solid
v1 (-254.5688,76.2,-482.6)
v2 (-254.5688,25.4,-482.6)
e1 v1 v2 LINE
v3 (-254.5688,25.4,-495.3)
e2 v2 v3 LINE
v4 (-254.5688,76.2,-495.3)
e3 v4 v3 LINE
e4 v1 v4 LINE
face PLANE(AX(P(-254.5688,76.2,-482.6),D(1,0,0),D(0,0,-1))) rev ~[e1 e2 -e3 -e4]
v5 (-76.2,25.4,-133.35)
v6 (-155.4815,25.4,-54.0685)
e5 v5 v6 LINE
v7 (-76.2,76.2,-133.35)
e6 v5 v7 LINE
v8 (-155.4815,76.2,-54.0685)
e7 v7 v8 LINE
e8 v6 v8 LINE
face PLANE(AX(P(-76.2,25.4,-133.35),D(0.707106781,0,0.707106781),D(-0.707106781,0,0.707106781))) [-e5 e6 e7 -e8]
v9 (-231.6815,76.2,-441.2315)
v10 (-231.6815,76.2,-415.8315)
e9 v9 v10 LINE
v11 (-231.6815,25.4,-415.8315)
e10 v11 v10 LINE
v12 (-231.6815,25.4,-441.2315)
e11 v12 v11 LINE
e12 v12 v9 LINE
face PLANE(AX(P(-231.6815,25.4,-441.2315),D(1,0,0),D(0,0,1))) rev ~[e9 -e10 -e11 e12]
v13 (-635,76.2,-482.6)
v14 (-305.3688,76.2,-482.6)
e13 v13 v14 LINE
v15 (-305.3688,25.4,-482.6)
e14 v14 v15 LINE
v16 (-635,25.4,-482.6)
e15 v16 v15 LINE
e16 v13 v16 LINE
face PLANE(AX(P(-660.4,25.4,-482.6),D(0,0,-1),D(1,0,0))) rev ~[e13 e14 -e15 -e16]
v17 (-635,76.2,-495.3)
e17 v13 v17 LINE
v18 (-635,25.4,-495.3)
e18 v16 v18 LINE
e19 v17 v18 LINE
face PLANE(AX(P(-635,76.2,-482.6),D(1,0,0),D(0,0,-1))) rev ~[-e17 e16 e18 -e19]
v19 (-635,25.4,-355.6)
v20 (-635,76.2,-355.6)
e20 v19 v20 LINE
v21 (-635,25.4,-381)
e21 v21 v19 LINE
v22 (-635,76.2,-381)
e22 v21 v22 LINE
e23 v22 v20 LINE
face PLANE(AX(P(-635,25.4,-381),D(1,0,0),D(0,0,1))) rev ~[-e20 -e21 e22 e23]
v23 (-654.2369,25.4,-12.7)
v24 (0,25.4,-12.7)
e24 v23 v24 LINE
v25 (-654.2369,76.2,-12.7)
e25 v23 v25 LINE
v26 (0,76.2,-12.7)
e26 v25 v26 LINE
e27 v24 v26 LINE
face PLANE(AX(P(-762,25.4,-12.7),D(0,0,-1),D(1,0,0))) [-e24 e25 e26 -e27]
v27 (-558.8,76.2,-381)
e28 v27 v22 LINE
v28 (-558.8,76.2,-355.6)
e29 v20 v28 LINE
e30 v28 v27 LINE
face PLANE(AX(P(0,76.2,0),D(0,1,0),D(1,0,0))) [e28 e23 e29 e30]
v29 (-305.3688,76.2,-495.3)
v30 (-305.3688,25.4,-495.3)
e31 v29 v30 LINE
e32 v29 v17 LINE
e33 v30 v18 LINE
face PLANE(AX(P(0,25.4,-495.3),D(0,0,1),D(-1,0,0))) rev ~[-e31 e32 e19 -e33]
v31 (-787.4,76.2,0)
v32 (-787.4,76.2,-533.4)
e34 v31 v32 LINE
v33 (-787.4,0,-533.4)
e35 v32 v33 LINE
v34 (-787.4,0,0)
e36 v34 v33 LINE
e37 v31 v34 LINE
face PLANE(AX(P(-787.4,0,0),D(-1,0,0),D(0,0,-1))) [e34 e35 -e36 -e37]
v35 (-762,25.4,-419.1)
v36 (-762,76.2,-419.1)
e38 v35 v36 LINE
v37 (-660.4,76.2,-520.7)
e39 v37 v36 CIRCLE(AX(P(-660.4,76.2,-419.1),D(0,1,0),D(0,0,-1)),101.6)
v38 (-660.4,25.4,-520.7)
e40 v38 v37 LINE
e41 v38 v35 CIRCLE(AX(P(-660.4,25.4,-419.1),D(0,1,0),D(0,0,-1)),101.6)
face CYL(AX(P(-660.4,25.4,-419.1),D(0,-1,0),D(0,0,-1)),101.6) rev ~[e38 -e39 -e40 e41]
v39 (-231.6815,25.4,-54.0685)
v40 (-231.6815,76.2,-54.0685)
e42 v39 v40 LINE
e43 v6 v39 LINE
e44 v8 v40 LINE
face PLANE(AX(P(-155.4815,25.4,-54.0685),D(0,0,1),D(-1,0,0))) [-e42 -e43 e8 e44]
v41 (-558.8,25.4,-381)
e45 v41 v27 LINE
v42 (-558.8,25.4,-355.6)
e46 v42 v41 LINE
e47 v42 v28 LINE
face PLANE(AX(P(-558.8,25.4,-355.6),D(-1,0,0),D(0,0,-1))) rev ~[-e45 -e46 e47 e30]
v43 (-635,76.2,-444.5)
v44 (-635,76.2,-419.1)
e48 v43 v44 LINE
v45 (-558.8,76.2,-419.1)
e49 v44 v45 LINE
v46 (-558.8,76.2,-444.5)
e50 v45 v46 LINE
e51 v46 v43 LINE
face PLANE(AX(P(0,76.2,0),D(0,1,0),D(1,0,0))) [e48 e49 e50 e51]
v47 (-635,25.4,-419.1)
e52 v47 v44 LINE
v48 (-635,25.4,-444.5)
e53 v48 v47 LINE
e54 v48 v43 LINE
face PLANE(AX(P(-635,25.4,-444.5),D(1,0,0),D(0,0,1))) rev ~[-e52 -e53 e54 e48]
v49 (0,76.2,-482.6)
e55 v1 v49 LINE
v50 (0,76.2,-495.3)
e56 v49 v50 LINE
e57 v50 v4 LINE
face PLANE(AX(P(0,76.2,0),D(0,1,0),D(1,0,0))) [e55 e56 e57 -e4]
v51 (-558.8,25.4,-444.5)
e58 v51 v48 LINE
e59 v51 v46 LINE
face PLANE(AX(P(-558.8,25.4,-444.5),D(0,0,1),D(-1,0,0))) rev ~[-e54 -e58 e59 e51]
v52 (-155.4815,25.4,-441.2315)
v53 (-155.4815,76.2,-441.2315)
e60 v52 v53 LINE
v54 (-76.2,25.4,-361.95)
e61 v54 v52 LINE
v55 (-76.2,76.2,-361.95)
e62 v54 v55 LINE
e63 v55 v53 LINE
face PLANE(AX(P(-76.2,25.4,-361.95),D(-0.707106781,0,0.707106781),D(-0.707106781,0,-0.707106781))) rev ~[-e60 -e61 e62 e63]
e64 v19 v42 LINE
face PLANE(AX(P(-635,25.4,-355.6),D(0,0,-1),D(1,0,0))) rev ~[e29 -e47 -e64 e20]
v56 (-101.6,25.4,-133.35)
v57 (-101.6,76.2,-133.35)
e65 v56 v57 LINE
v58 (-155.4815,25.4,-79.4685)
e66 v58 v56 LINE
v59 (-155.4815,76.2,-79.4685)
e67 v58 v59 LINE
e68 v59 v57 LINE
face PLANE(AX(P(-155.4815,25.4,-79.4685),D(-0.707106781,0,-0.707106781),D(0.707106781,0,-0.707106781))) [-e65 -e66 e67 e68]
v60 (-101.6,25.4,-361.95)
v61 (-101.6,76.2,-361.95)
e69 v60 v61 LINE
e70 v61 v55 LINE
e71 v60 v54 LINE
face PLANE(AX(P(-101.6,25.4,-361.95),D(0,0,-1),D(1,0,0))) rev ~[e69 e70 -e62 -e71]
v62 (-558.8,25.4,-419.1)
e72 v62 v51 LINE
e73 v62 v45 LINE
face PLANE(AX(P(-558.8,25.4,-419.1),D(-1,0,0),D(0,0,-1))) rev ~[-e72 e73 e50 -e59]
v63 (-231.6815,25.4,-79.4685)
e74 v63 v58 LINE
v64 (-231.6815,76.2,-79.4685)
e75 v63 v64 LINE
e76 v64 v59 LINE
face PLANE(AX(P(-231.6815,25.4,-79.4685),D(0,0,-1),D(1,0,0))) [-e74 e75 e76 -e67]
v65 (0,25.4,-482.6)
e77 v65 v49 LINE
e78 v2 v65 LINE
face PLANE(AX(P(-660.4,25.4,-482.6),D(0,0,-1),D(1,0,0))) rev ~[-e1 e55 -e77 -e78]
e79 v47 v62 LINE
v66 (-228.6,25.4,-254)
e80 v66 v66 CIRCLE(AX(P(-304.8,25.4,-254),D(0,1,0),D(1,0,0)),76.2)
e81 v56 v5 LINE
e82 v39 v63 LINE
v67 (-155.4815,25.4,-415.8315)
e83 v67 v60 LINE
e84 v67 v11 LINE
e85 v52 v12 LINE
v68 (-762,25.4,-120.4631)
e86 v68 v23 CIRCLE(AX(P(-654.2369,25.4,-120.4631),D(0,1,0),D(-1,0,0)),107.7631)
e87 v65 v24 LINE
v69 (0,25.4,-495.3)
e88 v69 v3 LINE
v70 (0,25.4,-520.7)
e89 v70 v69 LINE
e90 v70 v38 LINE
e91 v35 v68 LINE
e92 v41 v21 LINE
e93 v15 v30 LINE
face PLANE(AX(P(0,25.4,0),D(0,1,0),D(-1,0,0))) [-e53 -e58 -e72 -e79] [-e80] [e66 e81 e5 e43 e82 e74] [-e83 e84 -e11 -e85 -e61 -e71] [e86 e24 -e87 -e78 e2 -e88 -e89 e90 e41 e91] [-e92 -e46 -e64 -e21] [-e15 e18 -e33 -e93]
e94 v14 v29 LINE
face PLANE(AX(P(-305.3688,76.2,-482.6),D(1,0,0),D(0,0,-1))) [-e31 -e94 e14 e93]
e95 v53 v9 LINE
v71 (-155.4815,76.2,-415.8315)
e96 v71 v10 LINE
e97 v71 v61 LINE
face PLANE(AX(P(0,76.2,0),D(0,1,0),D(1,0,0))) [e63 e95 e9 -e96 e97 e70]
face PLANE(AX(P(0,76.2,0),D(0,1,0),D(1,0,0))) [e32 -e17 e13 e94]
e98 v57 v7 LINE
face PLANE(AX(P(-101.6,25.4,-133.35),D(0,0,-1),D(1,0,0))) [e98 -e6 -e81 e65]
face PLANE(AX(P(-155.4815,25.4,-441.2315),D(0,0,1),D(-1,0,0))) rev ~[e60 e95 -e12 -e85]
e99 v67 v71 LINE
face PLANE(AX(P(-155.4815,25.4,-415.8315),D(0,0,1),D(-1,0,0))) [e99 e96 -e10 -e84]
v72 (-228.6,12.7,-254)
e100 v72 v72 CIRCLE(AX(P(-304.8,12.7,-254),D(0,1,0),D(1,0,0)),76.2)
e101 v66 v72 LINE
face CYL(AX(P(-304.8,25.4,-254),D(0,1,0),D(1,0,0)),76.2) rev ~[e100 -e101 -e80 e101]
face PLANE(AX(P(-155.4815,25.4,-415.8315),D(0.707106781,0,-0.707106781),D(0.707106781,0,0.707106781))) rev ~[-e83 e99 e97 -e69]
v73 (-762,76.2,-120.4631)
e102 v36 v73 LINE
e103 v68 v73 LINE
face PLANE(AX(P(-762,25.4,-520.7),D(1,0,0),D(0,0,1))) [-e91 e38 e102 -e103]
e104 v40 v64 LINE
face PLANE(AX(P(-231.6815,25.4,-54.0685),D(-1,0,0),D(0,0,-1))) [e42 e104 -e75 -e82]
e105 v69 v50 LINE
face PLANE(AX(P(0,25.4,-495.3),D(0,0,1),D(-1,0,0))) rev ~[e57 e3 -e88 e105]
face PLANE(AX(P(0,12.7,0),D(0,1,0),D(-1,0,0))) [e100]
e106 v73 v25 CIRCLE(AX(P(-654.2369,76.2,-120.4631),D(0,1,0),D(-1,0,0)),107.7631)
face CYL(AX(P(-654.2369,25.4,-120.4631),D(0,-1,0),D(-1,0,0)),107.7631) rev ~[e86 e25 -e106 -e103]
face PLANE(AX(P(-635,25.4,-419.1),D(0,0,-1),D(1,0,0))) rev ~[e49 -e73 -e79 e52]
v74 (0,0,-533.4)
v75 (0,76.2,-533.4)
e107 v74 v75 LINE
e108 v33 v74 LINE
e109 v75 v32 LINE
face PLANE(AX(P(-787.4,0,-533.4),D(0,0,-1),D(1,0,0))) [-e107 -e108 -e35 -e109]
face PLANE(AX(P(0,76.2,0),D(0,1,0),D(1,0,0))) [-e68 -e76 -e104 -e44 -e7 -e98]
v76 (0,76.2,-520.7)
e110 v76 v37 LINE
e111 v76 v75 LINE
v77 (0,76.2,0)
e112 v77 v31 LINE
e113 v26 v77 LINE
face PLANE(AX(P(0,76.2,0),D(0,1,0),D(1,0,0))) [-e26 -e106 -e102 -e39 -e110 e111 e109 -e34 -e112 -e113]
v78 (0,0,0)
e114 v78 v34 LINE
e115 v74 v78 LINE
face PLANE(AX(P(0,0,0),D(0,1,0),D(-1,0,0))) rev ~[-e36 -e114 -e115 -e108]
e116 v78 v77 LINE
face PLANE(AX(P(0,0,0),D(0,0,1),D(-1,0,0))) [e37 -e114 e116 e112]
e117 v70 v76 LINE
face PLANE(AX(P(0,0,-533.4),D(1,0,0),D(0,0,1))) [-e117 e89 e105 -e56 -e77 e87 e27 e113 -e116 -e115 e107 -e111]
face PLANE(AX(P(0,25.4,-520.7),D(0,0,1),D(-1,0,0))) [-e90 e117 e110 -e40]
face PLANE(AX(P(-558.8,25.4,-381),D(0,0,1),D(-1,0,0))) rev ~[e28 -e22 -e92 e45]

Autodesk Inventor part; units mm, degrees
ref_plane "YZ Plane" through (0, 0, 0) normal (1, 0, 0) x (0, 1, 0)
ref_plane "XZ Plane" through (0, 0, 0) normal (0, 1, 0) x (-1, 0, 0)
ref_plane "XY Plane" through (0, 0, 0) normal (0, 0, 1) x (1, 0, 0)
sketch "Sketch1" plane through (0, 0, 0) normal (0, 1, 0) x (-1, 0, 0)
  line L0 (0, 0) -> (787.4, 0)
  line L1 (787.4, 0) -> (787.4, -533.4)
  line L2 (787.4, -533.4) -> (0, -533.4)
  line L3 (0, -533.4) -> (0, 0)
  dimension "d0" = 787.4
  dimension "d1" = 533.4
extrude "Extrusion1" add sketch "Sketch1" along normal blind 25.4
sketch "Sketch2" plane through (0, 25.4, 0) normal (0, 1, 0) x (1, 0, 0)
  line L0 (-787.4, 0) -> (0, 0) projected
  line L1 (-787.4, 533.4) -> (-787.4, 0) projected
  line L2 (0, 0) -> (-787.4, 0)
  line L3 (-787.4, 0) -> (-787.4, 12.7)
  line L4 (-787.4, 12.7) -> (0, 12.7)
  line L5 (0, 12.7) -> (0, 0)
  line L6 (0, 533.4) -> (-787.4, 533.4) projected
  line L7 (0, 0) -> (0, 533.4) projected
  line L8 (-787.4, 533.4) -> (0, 533.4)
  line L9 (0, 533.4) -> (0, 520.7)
  line L10 (0, 520.7) -> (-787.4, 520.7)
  line L11 (-787.4, 520.7) -> (-787.4, 533.4)
  line L12 (-787.4, 533.4) -> (-762, 533.4)
  line L13 (-762, 533.4) -> (-762, 0)
  line L14 (-762, 0) -> (-787.4, 0)
  line L15 (-787.4, 0) -> (-787.4, 533.4)
  dimension "d4" = 12.7
  dimension "d5" = 12.7
  dimension "d6" = 25.4
extrude "Extrusion2" add sketch "Sketch2" along normal blind 50.8 contours L1 L4 L13 L0 | L13 L4 L5 L0 | L1 L10 L13 L4 | L1 L6 L13 L10 | L13 L6 L7 L10
sketch "Sketch3" plane through (0, 25.4, 0) normal (0, 1, 0) x (1, 0, 0)
  line L0 (0, 533.4) -> (-787.4, 533.4) construction
  line L1 (0, 533.4) -> (0, 520.7) construction
  line L2 (0, 533.4) -> (0, 0) construction
  line L3 (0, 12.7) -> (0, 520.7) construction
  line L4 (0, 520.7) -> (0, 495.3) construction
  line L5 (-762, 520.7) -> (-762, 12.7) construction
  line L6 (-762, 520.7) -> (-762, 495.3) construction
  line L7 (0, 520.7) -> (-762, 520.7) construction
  line L8 (-762, 520.7) -> (-762, 419.1) construction
  line L9 (-762, 520.7) -> (-660.4, 520.7) construction
  arc A0 (-660.4, 520.7) -> (-762, 419.1) centre (-660.4, 419.1) ccw construction
  line L10 (0, 495.3) -> (-660.4, 495.3)
  line L11 (-660.4, 495.3) -> (-660.4, 482.6)
  line L12 (-660.4, 482.6) -> (0, 482.6)
  line L13 (0, 482.6) -> (0, 495.3)
  arc A1 (-660.4, 520.7) -> (-762, 419.1) centre (-660.4, 419.1) ccw
  line L14 (-762, 419.1) -> (-762, 520.7)
  line L15 (-762, 520.7) -> (-660.4, 520.7)
  dimension "d9" = 12.7
  dimension "d10" = 25.4
  dimension "d11" = 25.4
  dimension "d12" = 101.6
  dimension "d13" = 101.6
  dimension "d14" = 12.7
extrude "Extrusion3" add sketch "Sketch3" along normal blind 50.8
sketch "Sketch4" plane through (0, 25.4, 0) normal (0, 1, 0) x (1, 0, 0)
  line L0 (0, 12.7) -> (-762, 12.7) construction
  line L1 (-762, 12.7) -> (-654.2369, 120.4631) construction
  line L2 (-762, 12.7) -> (-609.6, 12.7) construction
  line L3 (-762, 419.1) -> (-762, 12.7) projected
  arc A0 (-762, 120.4631) -> (-654.2369, 12.7) centre (-654.2369, 120.4631) ccw
  line L4 (-654.2369, 12.7) -> (-762, 12.7)
  line L5 (-762, 120.4631) -> (-762, 12.7)
  point P0 (0, 0)
  dimension "d18" = 152.4
  dimension "d19" = 45
extrude "Extrusion4" add sketch "Sketch4" along normal blind 50.8
sketch "Sketch6" plane through (0, 76.2, 0) normal (0, 1, 0) x (1, 0, 0)
  line L0 (-660.4, 482.6) -> (0, 482.6) projected
  line L1 (-254.5688, 482.6) -> (-254.5688, 495.3)
  line L2 (0, 495.3) -> (-660.4, 495.3) projected
  line L3 (-254.5688, 482.6) -> (-305.3688, 482.6)
  line L4 (-305.3688, 482.6) -> (-305.3688, 495.3)
  line L5 (-305.3688, 495.3) -> (-254.5688, 495.3)
  point P0 (0, 0)
  dimension "d22" = 50.8
extrude "Extrusion5" cut sketch "Sketch6" against normal blind 50.8
sketch "Sketch8" plane through (0, 76.2, 0) normal (0, 1, 0) x (1, 0, 0)
  line L0 (-305.3688, 482.6) -> (-660.4, 482.6) projected
  line L1 (-660.4, 482.6) -> (-635, 482.6)
  line L2 (-635, 482.6) -> (-635, 495.3)
  line L3 (-305.3688, 495.3) -> (-660.4, 495.3) projected
  line L4 (-660.4, 495.3) -> (-635, 495.3)
  line L5 (-660.4, 482.6) -> (-660.4, 495.3) projected
  line L6 (-660.4, 482.6) -> (-660.4, 495.3)
  point P0 (0, 0)
  dimension "d26" = 25.4
extrude "Extrusion6" cut sketch "Sketch8" against normal blind 50.8
sketch "Sketch7" plane through (0, 25.4, 0) normal (0, 1, 0) x (1, 0, 0)
  line L0 (-254.5688, 495.3) -> (-279.9688, 520.7) construction
  line L1 (0, 520.7) -> (-660.4, 520.7) construction
  line L2 (-254.5688, 495.3) -> (-218.6478, 495.3) construction
  point P0 (0, 0)
  dimension "d25" = 135
sketch "Sketch9" plane through (0, 25.4, 0) normal (0, 1, 0) x (1, 0, 0)
  line L0 (0, 520.7) -> (-660.4, 520.7) construction
  line L1 (-635, 495.3) -> (-305.3688, 495.3) construction
  line L2 (-660.4, 520.7) -> (-635, 495.3) construction
  point P0 (0, 0)
sketch "Sketch10" plane through (0, 25.4, 0) normal (0, 1, 0) x (1, 0, 0)
  line L0 (-635, 482.6) -> (-305.3688, 482.6) construction
  line L1 (-635, 482.6) -> (-635, 444.5) construction
  line L2 (-635, 444.5) -> (-635, 419.1) construction
  line L3 (-635, 419.1) -> (-635, 381) construction
  line L4 (-635, 381) -> (-635, 355.6) construction
  line L5 (-635, 355.6) -> (-558.8, 355.6)
  line L6 (-558.8, 355.6) -> (-558.8, 381)
  line L7 (-558.8, 381) -> (-635, 381)
  line L8 (-635, 381) -> (-635, 355.6)
  line L9 (-635, 419.1) -> (-558.8, 419.1)
  line L10 (-558.8, 419.1) -> (-558.8, 444.5)
  line L11 (-558.8, 444.5) -> (-635, 444.5)
  line L12 (-635, 444.5) -> (-635, 419.1)
  point P0 (0, 0)
  dimension "d29" = 38.1
  dimension "d30" = 25.4
  dimension "d31" = 38.1
  dimension "d32" = 25.4
  dimension "d33" = 76.2
extrude "Extrusion7" add sketch "Sketch10" along normal blind 50.8
sketch "Sketch11" plane through (0, 25.4, 0) normal (0, 1, 0) x (1, 0, 0)
  line L0 (0, 12.7) -> (0, 247.65) construction
  line L1 (0, 247.65) -> (-101.6, 247.65) construction
  line L2 (-101.6, 247.65) -> (-101.6, 209.55) construction
  line L3 (-101.6, 209.55) -> (-101.6, 133.35) construction
  line L4 (-101.6, 133.35) -> (-155.4815, 79.4685) construction
  line L5 (-155.4815, 79.4685) -> (-231.6815, 79.4685) construction
  line L6 (-101.6, 247.65) -> (-101.6, 361.95) construction
  line L7 (-101.6, 361.95) -> (-155.4815, 415.8315) construction
  line L8 (-155.4815, 415.8315) -> (-231.6815, 415.8315) construction
  line L9 (-155.4815, 79.4685) -> (-101.6, 133.35)
  line L10 (-101.6, 133.35) -> (-76.2, 133.35)
  line L11 (-76.2, 133.35) -> (-155.4815, 54.0685)
  line L12 (-155.4815, 54.0685) -> (-231.6815, 54.0685)
  line L13 (-231.6815, 54.0685) -> (-231.6815, 79.4685)
  line L14 (-231.6815, 79.4685) -> (-155.4815, 79.4685)
  line L15 (-101.6, 361.95) -> (-76.2, 361.95)
  line L16 (-76.2, 361.95) -> (-155.4815, 441.2315)
  line L17 (-155.4815, 441.2315) -> (-231.6815, 441.2315)
  line L18 (-231.6815, 441.2315) -> (-231.6815, 415.8315)
  line L19 (-155.4815, 415.8315) -> (-231.6815, 415.8315)
  line L20 (-155.4815, 415.8315) -> (-101.6, 361.95)
  point P0 (0, 0)
  dimension "d36" = 234.95
  dimension "d37" = 101.6
  dimension "d38" = 38.1
  dimension "d39" = 76.2
  dimension "d40" = 76.2
  dimension "d41" = 135
  dimension "d42" = 76.2
  dimension "d43" = 114.3
  dimension "d44" = 76.2
  dimension "d45" = 135
  dimension "d46" = 25.4
extrude "Extrusion8" add sketch "Sketch11" along normal blind 50.8
sketch "Sketch12" plane through (0, 25.4, 0) normal (0, 1, 0) x (1, 0, 0)
  line L0 (0, 12.7) -> (0, 482.6) construction
  line L1 (0, 12.7) -> (0, 254) construction
  line L2 (0, 254) -> (-304.8, 254) construction
  circle A0 centre (-304.8, 254) radius 76.2
  point P0 (0, 0)
  dimension "d49" = 241.3
  dimension "d50" = 304.8
  dimension "d51" = 152.4
emboss "Emboss1" sketch "Sketch12" operation cut depth 12.7 direction (0, -1, 0)
properties part number "Playfield"
